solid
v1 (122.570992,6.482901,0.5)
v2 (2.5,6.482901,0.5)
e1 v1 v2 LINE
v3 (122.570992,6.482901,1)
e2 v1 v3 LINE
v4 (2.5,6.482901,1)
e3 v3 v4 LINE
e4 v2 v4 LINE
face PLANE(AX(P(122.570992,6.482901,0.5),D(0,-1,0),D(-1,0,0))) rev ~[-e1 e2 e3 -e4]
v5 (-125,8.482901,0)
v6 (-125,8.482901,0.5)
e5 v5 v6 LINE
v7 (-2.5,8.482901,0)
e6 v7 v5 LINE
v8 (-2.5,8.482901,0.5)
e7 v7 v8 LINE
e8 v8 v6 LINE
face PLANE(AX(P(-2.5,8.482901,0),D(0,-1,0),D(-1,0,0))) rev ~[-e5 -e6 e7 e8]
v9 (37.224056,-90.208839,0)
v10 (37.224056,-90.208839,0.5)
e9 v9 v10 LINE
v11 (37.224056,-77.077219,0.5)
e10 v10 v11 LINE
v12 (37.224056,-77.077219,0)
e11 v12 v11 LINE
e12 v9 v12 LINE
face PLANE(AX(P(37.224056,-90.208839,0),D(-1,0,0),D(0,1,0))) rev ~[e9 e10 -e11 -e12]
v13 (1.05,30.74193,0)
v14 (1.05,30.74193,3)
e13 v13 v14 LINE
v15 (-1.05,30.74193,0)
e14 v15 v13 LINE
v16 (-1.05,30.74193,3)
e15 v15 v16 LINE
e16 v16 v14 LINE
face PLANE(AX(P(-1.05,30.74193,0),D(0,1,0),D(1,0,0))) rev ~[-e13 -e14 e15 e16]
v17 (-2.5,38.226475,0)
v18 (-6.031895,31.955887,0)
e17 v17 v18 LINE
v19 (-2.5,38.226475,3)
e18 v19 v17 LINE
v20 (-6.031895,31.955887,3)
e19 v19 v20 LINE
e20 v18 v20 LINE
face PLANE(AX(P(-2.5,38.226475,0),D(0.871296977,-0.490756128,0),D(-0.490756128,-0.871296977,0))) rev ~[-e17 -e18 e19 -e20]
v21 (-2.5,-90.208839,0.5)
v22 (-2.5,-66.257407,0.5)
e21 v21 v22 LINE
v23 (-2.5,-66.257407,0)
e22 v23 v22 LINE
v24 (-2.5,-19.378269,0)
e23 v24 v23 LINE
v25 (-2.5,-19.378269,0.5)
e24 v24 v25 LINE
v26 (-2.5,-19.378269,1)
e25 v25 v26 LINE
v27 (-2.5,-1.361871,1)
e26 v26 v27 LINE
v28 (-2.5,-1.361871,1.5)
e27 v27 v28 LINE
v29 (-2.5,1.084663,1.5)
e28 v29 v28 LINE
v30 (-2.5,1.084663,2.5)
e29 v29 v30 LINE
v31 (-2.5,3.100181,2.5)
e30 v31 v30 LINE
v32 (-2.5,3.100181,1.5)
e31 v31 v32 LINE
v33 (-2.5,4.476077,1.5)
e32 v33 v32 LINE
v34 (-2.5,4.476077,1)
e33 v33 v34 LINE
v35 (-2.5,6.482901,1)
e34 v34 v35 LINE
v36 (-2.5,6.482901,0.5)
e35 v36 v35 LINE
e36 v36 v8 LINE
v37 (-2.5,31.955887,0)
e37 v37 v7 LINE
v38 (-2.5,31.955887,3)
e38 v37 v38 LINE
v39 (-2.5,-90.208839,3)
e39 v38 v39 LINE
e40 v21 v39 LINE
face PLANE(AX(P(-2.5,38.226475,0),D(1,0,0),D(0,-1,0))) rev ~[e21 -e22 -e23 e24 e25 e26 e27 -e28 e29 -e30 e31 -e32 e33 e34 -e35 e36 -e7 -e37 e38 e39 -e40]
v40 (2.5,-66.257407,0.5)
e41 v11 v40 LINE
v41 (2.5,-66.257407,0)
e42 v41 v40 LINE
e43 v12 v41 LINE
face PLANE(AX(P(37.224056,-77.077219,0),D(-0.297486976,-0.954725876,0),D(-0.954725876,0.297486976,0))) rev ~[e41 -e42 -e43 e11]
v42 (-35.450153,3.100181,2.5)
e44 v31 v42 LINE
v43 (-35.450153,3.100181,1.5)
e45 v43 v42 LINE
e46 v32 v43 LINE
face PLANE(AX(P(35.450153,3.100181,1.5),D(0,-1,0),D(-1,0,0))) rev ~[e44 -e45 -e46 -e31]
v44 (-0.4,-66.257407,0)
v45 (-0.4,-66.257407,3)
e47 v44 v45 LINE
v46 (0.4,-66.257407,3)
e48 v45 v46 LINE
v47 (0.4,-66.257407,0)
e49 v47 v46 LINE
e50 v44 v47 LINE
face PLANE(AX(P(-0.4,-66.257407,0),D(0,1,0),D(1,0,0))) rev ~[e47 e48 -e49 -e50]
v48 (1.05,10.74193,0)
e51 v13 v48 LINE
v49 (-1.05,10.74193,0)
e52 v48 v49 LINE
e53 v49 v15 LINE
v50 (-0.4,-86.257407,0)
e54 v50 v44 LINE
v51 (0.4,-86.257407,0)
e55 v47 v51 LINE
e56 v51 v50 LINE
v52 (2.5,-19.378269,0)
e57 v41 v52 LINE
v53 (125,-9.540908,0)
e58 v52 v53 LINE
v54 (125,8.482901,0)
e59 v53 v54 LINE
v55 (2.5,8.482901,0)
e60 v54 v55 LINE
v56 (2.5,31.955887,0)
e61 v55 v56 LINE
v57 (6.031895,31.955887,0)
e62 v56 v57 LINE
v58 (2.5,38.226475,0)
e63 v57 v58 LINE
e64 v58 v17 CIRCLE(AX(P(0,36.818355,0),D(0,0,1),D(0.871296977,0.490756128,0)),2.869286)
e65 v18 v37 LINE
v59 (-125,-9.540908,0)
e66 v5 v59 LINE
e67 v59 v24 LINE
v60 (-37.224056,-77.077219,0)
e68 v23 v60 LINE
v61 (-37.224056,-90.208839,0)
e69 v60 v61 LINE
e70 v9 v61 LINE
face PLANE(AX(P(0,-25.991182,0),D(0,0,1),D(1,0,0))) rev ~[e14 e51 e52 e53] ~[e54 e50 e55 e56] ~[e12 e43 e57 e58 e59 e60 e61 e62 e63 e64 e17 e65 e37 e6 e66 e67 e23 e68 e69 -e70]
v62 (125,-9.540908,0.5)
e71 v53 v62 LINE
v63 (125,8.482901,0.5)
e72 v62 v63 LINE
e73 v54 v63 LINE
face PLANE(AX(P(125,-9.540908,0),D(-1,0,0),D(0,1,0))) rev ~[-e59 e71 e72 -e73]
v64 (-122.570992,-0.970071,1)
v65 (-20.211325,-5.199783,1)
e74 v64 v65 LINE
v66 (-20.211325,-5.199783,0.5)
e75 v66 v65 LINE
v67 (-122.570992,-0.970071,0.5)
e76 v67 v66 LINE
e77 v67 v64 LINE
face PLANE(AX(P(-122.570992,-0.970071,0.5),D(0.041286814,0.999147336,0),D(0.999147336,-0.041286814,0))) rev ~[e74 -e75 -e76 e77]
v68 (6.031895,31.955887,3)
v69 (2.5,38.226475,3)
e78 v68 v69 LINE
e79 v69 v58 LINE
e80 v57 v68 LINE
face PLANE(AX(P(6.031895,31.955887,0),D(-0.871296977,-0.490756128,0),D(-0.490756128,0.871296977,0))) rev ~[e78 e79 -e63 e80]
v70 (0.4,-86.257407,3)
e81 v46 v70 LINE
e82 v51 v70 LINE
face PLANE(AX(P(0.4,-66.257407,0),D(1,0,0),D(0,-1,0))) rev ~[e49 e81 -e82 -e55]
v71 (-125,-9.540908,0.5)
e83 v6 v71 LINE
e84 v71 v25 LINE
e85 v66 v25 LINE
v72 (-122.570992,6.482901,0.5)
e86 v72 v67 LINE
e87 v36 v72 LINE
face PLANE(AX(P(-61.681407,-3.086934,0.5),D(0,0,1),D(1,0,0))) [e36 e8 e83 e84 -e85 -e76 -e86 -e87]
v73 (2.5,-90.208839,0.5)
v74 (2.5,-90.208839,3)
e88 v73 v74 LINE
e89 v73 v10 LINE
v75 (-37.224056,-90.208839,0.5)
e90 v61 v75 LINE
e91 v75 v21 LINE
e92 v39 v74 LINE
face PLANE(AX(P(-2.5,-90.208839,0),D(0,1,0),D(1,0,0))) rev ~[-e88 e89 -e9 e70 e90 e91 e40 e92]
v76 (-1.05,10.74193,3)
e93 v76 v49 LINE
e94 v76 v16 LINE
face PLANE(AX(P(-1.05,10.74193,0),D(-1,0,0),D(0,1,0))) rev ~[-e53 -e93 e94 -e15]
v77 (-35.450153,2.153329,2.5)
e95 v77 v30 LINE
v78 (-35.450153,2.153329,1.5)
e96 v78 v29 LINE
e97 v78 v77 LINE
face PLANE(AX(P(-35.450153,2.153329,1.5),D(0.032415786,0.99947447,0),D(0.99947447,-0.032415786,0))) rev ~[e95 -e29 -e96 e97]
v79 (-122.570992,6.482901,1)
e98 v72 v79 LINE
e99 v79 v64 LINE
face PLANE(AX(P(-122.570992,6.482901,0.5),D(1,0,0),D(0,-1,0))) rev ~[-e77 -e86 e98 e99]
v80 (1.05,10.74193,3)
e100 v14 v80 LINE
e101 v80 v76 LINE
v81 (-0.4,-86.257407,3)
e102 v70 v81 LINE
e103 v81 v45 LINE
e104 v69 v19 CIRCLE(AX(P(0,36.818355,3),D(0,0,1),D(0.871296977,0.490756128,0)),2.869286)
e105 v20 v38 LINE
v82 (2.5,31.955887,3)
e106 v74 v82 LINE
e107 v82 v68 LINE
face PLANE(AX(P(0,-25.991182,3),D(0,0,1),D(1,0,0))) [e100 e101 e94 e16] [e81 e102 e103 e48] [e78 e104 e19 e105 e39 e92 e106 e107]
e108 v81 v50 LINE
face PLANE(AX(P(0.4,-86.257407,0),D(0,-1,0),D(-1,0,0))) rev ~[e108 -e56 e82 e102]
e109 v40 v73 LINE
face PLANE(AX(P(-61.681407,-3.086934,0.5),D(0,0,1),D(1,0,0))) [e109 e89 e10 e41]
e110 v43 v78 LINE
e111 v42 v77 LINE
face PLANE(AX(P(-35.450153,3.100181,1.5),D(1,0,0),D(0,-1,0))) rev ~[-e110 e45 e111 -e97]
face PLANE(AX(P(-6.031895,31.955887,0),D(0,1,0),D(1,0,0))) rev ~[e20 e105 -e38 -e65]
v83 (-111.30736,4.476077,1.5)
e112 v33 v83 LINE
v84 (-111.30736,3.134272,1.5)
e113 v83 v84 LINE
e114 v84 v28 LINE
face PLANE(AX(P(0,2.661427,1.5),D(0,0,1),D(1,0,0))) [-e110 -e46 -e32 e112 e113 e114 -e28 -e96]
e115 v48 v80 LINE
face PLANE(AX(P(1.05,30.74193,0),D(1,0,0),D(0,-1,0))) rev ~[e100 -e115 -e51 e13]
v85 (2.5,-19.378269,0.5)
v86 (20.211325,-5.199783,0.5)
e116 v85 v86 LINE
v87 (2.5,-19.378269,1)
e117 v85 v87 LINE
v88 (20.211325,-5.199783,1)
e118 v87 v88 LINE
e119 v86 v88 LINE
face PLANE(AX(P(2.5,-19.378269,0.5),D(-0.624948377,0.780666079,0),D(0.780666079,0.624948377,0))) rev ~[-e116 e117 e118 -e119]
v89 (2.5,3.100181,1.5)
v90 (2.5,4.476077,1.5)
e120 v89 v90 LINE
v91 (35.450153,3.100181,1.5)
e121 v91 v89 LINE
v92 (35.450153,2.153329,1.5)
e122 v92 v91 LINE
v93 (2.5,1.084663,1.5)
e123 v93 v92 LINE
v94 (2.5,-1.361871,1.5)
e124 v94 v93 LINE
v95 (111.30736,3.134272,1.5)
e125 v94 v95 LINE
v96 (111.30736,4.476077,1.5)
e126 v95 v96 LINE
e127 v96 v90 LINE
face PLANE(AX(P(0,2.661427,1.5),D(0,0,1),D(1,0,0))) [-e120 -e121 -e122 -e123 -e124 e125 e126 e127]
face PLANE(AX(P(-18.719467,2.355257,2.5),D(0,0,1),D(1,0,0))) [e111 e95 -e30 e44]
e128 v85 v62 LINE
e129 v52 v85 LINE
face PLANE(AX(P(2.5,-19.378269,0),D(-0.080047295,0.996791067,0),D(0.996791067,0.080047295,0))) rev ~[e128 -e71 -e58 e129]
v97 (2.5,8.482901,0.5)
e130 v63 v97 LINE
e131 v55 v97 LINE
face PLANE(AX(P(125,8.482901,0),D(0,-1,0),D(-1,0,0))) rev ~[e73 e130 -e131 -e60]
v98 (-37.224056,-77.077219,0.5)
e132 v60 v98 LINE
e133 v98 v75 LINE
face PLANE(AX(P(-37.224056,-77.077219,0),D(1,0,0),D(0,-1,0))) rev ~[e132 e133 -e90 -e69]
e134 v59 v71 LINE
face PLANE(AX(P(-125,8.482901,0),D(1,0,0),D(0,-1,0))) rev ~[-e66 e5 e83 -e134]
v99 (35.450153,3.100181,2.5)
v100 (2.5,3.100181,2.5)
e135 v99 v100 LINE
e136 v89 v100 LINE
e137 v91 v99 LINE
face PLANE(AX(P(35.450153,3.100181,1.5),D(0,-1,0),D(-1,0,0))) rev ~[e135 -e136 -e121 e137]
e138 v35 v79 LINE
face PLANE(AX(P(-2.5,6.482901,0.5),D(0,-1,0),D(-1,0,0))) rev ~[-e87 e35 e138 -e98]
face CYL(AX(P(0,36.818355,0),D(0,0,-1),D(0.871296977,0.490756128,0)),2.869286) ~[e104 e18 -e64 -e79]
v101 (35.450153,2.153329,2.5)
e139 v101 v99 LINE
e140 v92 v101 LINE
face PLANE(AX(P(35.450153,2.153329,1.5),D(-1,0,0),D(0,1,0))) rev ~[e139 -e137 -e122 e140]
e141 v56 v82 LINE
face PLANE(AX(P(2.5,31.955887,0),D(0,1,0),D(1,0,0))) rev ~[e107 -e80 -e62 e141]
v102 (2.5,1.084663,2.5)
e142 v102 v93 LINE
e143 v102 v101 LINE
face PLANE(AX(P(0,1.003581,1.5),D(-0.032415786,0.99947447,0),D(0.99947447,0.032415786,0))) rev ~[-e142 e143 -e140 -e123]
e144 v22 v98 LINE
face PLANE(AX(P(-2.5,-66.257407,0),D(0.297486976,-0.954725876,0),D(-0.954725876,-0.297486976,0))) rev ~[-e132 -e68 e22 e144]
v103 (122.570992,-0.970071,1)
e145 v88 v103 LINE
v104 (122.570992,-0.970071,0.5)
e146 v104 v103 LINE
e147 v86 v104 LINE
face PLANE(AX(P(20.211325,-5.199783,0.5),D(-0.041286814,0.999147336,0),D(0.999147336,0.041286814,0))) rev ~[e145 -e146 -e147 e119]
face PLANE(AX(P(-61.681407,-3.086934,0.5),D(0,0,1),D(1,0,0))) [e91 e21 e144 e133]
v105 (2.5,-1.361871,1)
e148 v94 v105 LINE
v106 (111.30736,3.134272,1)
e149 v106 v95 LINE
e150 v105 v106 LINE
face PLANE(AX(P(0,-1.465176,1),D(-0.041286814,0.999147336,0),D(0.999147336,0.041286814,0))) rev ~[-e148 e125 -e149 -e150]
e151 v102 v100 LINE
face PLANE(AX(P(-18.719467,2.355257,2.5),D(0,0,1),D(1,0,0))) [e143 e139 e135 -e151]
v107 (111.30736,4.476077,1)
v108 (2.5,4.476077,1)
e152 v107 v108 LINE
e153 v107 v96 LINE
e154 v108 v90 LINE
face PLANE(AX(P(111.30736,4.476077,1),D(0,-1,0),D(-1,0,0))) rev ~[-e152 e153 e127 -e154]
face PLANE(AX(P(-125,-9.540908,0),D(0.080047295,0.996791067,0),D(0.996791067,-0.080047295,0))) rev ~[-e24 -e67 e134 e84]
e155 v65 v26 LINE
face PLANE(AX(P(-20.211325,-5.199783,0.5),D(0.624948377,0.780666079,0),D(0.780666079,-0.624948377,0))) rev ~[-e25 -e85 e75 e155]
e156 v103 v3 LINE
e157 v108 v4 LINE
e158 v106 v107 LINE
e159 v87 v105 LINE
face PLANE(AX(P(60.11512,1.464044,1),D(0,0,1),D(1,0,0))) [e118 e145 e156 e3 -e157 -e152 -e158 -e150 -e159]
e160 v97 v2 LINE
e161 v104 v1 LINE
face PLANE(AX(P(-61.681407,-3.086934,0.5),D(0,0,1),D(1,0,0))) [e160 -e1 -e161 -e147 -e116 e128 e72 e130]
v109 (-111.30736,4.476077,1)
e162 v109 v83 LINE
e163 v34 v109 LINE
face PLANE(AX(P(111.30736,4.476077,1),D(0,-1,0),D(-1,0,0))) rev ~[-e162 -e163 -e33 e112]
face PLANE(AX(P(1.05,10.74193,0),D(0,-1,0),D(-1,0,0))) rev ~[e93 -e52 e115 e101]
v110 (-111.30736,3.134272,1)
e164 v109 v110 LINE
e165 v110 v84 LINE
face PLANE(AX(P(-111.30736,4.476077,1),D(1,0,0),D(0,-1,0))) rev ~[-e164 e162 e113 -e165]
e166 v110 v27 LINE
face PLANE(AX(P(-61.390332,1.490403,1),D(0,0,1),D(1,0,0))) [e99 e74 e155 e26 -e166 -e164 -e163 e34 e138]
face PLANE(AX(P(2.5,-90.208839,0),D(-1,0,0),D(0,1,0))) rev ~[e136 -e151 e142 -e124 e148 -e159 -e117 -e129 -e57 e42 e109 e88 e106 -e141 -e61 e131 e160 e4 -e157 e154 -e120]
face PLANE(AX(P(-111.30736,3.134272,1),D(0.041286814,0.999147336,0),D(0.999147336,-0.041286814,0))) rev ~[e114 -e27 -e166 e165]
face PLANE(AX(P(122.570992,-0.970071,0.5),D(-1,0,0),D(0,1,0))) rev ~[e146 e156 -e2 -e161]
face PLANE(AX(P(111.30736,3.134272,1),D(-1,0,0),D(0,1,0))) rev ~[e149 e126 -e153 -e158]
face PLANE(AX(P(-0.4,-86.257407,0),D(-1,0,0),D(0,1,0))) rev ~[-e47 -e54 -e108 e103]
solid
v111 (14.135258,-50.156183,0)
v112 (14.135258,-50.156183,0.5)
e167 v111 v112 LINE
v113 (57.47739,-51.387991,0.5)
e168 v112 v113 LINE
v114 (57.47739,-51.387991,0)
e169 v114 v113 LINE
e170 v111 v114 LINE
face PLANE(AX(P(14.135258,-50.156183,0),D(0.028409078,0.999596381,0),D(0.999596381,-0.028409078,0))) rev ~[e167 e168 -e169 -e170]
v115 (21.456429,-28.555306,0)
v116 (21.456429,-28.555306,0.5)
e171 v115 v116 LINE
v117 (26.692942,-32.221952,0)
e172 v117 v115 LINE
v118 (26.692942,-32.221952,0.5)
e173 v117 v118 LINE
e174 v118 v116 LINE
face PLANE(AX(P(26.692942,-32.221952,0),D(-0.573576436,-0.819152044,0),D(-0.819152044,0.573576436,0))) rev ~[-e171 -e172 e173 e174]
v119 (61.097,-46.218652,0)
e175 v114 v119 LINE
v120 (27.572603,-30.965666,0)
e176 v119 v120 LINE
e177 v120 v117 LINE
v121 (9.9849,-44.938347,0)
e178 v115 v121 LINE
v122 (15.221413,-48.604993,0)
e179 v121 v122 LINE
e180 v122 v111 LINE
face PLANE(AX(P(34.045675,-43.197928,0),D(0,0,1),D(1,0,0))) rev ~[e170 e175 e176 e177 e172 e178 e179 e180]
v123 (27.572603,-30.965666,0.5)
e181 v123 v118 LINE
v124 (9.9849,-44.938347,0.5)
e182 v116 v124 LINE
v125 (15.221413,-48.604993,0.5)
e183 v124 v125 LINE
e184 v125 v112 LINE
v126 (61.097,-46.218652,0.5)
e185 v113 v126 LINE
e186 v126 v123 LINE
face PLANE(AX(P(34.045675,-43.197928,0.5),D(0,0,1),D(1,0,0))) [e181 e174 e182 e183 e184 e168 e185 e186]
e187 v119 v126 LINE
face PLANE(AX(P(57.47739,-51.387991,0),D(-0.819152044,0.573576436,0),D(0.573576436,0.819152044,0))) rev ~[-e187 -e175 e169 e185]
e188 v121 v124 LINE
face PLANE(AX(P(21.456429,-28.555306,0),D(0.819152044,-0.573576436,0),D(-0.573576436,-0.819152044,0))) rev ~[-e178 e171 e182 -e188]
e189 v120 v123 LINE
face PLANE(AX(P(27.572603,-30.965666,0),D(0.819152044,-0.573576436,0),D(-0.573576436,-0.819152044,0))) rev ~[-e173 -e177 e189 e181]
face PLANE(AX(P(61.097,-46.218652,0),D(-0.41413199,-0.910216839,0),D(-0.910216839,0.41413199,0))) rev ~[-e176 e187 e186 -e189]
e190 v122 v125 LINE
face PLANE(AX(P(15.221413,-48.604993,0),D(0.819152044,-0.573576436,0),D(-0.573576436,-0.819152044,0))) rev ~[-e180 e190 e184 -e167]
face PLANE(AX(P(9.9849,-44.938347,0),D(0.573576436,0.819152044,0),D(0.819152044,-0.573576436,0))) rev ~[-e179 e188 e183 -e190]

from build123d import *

# Parameters (mm, degrees)
F1_DEPTH = 0.5
F2_DEPTH = 3
F4_DEPTH = 0.5
F5_DEPTH = 0.5
F7_DEPTH = 0.5
F9_DEPTH = 1


# Not quite as in the source:
# - a feature names something its author has since deleted; it is built from what else it names


with BuildPart() as f1:
    # F0 (on Top) → F1 (new body)
    with BuildSketch(Plane.XY):
        Polygon((-2.5, -19.3782690912), (-2.5, 8.4829014608), (-125, 8.4829014608), (-125, 0), (-125, -9.5409080386), align=None)
        Polygon((-2.5, -90.2088385105), (-2.5, -66.2574071428), (-37.2240561792, -77.0772191324), (-37.2240561792, -90.2088385105), align=None)
        Polygon((37.2240561792, -77.0772191324), (2.5, -66.2574071428), (2.5, -90.2088385105), (37.2240561792, -90.2088385105), align=None)
        Polygon((125, 8.4829014608), (2.5, 8.4829014608), (2.5, -19.3782690912), (125, -9.5409080386), (125, 0), align=None)
        Polygon((2.5, 38.2264746347), (0, 38.2264746347), (-2.5, 38.2264746347), (-2.5, 31.9558866322), (-2.5, 8.4829014608), (-2.5, -19.3782690912), (-2.5, -66.2574071428), (-2.5, -90.2088385105), (0, -90.2088385105), (2.5, -90.2088385105), (2.5, -66.2574071428), (2.5, -19.3782690912), (2.5, 8.4829014608), (2.5, 31.9558866322), align=None)
        Polygon((-0.4, -66.2574071428), (0, -66.2574071428), (0.4, -66.2574071428), (0.4, -86.2574071428), (0, -86.2574071428), (-0.4, -86.2574071428), align=None, mode=Mode.SUBTRACT)
        Polygon((-1.05, 30.741930455), (0, 30.741930455), (1.05, 30.741930455), (1.05, 10.741930455), (0, 10.741930455), (-1.05, 10.741930455), align=None, mode=Mode.SUBTRACT)
    extrude(amount=F1_DEPTH)

    # F0 (on Top) → F2 (join)
    with BuildSketch(Plane.XY):
        Polygon((2.5, 38.2264746347), (0, 38.2264746347), (-2.5, 38.2264746347), (-2.5, 31.9558866322), (-2.5, 8.4829014608), (-2.5, -19.3782690912), (-2.5, -66.2574071428), (-2.5, -90.2088385105), (0, -90.2088385105), (2.5, -90.2088385105), (2.5, -66.2574071428), (2.5, -19.3782690912), (2.5, 8.4829014608), (2.5, 31.9558866322), align=None)
        Polygon((-0.4, -66.2574071428), (0, -66.2574071428), (0.4, -66.2574071428), (0.4, -86.2574071428), (0, -86.2574071428), (-0.4, -86.2574071428), align=None, mode=Mode.SUBTRACT)
        Polygon((-1.05, 30.741930455), (0, 30.741930455), (1.05, 30.741930455), (1.05, 10.741930455), (0, 10.741930455), (-1.05, 10.741930455), align=None, mode=Mode.SUBTRACT)
        Polygon((-2.5, 31.9558866322), (-2.5, 38.2264746347), (-6.0318950564, 31.9558866322), align=None)
        Polygon((6.0318950564, 31.9558866322), (2.5, 38.2264746347), (2.5, 31.9558866322), align=None)
        with BuildLine():
            Line((-2.5, 38.2264746347), (0, 38.2264746347))
            Line((0, 38.2264746347), (2.5, 38.2264746347))
            ThreePointArc((2.5, 38.2264746347), (0, 39.6876408194), (-2.5, 38.2264746347))
        make_face()
    extrude(amount=F2_DEPTH)

    # F3 (on face) → F4 (join)
    with BuildSketch(Plane.XY.offset(0.5)):
        Polygon((-2.5, -5.9316507274), (-2.5, 6.4829014608), (-122.5709915161, 6.4829014608), (-122.5709915161, -0.9700714727), (-20.2113245095, -5.1997825289), align=None)
        Polygon((122.5709915161, 6.4829014608), (0, 6.4829014608), (0, -6.034955847), (20.2113245095, -5.1997825289), (122.5709915161, -0.9700714727), align=None)
        Polygon((-2.5, -19.3782690912), (-2.5, -5.9316507274), (-20.2113245095, -5.1997825289), align=None)
        Polygon((20.2113245095, -5.1997825289), (0, -6.034955847), (0, -19.3782690912), (2.5, -19.3782690912), align=None)
    extrude(amount=F4_DEPTH)

    # F6 (on face) → F7 (join)
    with BuildSketch(Plane.XY.offset(1)):
        Polygon((111.3073602319, 4.4760769233), (0, 4.4760769233), (-111.3073602319, 4.4760769233), (-111.3073602319, 3.1342721807), (0, -1.4651758829), (111.3073602319, 3.1342721807), align=None)
    extrude(amount=F7_DEPTH)

    # F8 (on face) → F9 (join)
    with BuildSketch(Plane.XY.offset(1.5)):
        Polygon((-2.5, 1.0846625931), (-2.5, 3.1001814641), (-35.4501530528, 3.1001814641), (-35.4501530528, 2.1533293184), align=None)
        Polygon((35.4501530528, 3.1001814641), (0, 3.1001814641), (-2.5, 3.1001814641), (-2.5, 1.0846625931), (0, 1.0035805171), (35.4501530528, 2.1533293184), align=None)
    extrude(amount=F9_DEPTH)


with BuildPart() as f5:
    # F0 (on Top) → F5 (new body)
    with BuildSketch(Plane.XY):
        Polygon((15.2214128825, -48.6049928758), (14.1352575937, -50.1561833865), (57.4773901376, -51.3879905945), (61.0969997942, -46.2186522782), (27.5726027584, -30.9656656737), (26.6929416095, -32.22195199), (21.4564287133, -28.5553061862), (9.9848999862, -44.9383470719), align=None)
    extrude(amount=F5_DEPTH)


solid = Compound([f1.part, f5.part])
